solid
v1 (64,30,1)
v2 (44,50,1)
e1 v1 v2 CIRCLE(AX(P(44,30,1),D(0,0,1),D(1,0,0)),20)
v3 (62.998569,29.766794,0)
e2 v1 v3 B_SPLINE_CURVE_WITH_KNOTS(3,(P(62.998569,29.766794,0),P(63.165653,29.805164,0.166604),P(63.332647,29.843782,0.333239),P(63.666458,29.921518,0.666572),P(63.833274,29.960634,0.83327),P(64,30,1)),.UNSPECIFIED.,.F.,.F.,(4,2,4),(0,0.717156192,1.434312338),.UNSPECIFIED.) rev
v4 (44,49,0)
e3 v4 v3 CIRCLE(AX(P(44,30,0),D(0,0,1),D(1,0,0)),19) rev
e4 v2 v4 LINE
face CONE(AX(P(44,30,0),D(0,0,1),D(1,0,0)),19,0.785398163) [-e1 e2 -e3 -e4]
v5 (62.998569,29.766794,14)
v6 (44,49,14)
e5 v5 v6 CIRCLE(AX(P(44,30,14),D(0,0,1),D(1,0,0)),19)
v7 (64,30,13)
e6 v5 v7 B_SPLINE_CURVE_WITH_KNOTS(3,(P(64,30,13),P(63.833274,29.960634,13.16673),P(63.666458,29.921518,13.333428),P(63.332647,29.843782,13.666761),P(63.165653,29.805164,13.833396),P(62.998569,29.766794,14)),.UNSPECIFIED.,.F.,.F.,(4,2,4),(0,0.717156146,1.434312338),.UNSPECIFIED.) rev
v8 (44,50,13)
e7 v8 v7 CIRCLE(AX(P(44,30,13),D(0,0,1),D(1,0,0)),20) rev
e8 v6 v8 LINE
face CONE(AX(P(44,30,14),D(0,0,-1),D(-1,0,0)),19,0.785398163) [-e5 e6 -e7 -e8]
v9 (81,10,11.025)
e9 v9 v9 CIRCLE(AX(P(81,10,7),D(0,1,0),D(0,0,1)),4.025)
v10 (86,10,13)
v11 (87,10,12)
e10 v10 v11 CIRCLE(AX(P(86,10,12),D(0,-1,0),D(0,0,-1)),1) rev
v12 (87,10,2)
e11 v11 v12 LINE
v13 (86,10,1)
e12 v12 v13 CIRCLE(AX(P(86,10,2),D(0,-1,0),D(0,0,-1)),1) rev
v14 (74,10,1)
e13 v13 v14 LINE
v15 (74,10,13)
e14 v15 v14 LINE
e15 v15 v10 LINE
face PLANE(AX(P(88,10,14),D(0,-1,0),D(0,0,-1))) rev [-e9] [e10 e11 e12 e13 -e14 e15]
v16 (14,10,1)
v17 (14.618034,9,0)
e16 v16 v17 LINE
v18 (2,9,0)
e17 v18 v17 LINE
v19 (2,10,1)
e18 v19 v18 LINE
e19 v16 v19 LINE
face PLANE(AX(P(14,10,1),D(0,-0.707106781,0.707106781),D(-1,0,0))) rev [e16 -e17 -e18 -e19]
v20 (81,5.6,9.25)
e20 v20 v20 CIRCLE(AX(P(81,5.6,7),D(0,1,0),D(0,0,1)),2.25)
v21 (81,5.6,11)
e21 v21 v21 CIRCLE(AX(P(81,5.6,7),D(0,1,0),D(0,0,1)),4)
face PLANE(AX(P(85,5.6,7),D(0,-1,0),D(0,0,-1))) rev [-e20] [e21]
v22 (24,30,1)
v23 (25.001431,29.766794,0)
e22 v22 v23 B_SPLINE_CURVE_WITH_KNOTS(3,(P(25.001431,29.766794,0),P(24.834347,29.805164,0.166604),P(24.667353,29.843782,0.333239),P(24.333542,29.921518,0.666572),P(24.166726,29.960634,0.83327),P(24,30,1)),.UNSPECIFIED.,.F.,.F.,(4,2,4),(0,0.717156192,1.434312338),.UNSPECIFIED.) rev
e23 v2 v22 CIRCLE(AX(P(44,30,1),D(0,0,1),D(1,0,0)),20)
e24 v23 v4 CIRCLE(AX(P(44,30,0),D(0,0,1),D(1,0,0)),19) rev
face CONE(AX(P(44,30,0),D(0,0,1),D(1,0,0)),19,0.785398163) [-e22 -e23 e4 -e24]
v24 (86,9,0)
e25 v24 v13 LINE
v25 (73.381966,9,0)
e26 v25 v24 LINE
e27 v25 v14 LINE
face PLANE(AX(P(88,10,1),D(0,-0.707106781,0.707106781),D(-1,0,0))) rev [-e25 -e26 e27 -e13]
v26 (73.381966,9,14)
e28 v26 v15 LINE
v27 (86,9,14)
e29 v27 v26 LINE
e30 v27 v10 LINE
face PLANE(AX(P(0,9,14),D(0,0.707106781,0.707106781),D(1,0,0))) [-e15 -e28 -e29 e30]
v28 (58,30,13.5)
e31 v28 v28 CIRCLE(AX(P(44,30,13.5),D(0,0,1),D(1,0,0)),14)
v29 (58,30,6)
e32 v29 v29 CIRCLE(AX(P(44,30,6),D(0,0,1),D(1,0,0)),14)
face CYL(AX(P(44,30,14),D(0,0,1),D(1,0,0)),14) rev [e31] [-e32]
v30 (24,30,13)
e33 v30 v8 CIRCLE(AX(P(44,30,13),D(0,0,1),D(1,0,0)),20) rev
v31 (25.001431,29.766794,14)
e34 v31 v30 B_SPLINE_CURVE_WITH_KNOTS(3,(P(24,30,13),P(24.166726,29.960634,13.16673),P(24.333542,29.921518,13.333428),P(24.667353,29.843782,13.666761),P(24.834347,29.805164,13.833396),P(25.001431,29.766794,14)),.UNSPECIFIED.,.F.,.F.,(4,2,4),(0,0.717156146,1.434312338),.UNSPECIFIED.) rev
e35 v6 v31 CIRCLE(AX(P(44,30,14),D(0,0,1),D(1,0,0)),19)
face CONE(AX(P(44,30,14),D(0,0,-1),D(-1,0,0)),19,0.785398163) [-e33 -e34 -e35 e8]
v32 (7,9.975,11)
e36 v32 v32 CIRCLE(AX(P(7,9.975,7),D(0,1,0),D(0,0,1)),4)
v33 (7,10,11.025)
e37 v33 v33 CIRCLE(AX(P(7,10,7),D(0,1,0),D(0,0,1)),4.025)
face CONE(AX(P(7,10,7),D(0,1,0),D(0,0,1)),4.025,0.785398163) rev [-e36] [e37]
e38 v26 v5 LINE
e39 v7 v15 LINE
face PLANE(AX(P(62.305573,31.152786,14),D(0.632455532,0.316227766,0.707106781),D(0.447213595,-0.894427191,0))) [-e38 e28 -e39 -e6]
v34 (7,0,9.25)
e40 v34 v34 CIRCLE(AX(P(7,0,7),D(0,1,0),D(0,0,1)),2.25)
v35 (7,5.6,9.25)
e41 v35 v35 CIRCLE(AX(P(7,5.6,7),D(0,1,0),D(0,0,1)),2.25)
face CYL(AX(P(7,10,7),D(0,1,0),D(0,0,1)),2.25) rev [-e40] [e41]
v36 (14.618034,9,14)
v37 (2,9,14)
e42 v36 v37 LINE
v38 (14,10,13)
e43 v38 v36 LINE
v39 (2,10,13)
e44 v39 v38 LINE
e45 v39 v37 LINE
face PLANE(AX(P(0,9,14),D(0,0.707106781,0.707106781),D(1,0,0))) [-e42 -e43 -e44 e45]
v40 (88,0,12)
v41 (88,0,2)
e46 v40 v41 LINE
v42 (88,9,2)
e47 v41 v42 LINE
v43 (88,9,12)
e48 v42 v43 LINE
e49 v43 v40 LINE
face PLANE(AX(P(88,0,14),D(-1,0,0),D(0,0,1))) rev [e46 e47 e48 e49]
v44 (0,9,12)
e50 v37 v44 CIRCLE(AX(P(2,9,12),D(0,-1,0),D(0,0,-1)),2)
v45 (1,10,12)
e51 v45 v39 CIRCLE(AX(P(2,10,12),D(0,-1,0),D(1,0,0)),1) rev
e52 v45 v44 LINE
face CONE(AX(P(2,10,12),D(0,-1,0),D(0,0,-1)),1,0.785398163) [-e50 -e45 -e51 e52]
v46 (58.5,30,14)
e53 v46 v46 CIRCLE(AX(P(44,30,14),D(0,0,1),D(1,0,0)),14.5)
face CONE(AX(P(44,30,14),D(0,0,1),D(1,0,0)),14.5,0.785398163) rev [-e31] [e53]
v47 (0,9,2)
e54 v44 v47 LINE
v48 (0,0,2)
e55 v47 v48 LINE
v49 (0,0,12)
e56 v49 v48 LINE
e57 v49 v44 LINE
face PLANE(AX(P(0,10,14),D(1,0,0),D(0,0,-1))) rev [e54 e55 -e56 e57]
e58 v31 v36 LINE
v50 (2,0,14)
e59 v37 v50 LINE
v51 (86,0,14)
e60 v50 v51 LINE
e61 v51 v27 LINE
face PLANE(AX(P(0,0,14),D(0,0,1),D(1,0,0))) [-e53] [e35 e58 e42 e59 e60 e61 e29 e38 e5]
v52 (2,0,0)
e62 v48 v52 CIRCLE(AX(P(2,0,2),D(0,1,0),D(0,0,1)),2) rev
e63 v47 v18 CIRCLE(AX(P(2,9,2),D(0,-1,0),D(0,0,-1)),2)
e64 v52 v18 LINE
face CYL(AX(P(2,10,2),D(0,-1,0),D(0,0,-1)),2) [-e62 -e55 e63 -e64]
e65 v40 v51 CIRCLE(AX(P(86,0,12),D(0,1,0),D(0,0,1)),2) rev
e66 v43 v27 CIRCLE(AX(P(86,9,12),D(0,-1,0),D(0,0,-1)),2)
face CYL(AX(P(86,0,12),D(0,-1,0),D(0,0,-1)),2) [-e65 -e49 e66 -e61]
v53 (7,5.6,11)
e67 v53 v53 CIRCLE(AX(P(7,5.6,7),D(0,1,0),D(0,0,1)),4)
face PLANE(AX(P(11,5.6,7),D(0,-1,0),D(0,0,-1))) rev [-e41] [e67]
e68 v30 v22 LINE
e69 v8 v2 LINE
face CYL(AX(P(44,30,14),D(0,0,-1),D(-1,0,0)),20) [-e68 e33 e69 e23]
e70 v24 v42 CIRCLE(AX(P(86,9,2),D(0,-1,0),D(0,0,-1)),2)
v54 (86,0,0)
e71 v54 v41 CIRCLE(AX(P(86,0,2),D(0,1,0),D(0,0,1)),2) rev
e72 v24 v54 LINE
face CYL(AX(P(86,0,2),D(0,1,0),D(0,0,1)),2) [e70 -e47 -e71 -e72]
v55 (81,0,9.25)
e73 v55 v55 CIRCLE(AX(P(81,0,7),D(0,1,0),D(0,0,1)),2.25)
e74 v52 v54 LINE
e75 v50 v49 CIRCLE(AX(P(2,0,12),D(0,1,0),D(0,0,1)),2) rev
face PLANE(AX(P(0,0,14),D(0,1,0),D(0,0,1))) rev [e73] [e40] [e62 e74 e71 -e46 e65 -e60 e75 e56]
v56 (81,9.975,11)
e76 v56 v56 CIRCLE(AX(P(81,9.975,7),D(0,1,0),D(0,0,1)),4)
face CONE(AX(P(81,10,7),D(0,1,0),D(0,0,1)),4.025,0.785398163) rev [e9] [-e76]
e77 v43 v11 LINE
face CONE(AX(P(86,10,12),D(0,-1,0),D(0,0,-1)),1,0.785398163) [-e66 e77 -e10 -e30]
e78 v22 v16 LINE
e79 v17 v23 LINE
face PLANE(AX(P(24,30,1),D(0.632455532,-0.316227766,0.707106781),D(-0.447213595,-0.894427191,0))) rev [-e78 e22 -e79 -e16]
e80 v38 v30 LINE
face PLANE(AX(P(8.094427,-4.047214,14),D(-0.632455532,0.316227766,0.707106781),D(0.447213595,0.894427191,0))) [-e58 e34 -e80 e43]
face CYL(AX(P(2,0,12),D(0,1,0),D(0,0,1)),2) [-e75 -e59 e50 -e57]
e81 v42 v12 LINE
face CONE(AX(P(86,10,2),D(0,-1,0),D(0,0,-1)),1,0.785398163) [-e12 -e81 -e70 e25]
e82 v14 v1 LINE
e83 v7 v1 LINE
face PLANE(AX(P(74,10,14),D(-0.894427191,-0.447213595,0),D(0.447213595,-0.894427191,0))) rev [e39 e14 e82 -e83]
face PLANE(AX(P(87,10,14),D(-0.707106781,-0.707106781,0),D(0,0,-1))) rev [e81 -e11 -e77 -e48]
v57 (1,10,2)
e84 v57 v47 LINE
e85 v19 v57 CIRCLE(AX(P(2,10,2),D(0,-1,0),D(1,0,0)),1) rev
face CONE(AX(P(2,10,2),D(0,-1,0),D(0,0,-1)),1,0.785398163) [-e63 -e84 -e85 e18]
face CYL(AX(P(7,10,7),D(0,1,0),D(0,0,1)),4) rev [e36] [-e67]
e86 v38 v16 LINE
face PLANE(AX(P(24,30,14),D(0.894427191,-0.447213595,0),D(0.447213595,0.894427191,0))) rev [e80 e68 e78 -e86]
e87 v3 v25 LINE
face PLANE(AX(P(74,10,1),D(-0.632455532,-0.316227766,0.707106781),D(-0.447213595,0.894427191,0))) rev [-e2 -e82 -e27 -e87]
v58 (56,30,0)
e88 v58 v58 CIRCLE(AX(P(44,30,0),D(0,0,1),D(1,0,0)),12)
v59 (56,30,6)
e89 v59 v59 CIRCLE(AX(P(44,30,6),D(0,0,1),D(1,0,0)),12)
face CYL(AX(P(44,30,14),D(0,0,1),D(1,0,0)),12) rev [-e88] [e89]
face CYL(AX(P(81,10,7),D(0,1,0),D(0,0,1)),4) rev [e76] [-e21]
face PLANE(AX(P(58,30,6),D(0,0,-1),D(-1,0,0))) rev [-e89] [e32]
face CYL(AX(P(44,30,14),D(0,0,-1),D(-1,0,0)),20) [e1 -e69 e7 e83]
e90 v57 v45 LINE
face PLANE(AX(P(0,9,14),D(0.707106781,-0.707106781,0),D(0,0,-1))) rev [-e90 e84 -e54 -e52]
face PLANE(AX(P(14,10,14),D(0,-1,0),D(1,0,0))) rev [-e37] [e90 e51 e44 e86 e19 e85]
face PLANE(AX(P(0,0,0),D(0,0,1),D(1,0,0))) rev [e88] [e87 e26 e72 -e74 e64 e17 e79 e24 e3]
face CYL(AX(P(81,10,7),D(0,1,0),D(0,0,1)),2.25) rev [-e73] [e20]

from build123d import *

# Parameters (mm, degrees)
BODY_DEPTH           = 14
TOP_FILLET_R         = 20
SIDE_FILLETS_R       = 2
DESIGN_CHAMFERS_SIZE = 1


# Read off the part's stored shape, not the designer's step: mounting_holes
with BuildPart() as part:
    # Sketch1 → body (new body)
    with BuildSketch(Plane.XY):
        Polygon((0, 0), (88, 0), (88, 10), (74, 10), (64, 30), (64, 50), (24, 50), (24, 30), (14, 10), (0, 10), align=None)
    extrude(amount=BODY_DEPTH)

    # top_fillet
    top_fillet_edges = [part.edges().sort_by_distance(p)[0] for p in [
        (24, 50, 7),
        (64, 50, 7),
    ]]
    fillet(top_fillet_edges, radius=TOP_FILLET_R - 0.0001)  # a hair under: the kernel refuses the full size

    # Sketch4 → bearing_hole (revolve, cut)
    with BuildSketch(Plane(origin=(44, 30, 14), x_dir=(0, -1, 0), z_dir=(1, 0, 0))):
        Polygon((0, 0), (0, 14), (12, 14), (12, 8), (14, 8), (14, 0.5), (14.5, 0), align=None)
    revolve(axis=Axis((44, 30, 20.35), (0, 0, -1)), mode=Mode.SUBTRACT)

    # mounting_holes outline → mounting_holes (revolve, cut)
    with BuildSketch(Plane(origin=(81, 0, 7), x_dir=(1, 0, 0), z_dir=(0, 0, 1))):
        Polygon((0, 0), (2.25, 0), (2.25, 5.6), (4, 5.6), (4, 9.975), (4.025, 10), (0, 10), align=None)
    revolve(axis=Axis((81, 0, 7), (0, 1, 0)), mode=Mode.SUBTRACT)

    # mounting_holes 2 outline → mounting_holes 2 (revolve, cut)
    with BuildSketch(Plane(origin=(7, 0, 7), x_dir=(1, 0, 0), z_dir=(0, 0, 1))):
        Polygon((0, 10), (0, 0), (2.25, 0), (2.25, 5.6), (4, 5.6), (4, 9.975), (4.025, 10), align=None)
    revolve(axis=Axis((7, 0, 7), (0, 1, 0)), mode=Mode.SUBTRACT)

    # side_fillets
    side_fillets_edges = [part.edges().sort_by_distance(p)[0] for p in [
        (88, 5, 14),
        (88, 5, 0),
        (0, 5, 0),
        (0, 5, 14),
    ]]
    fillet(side_fillets_edges, radius=SIDE_FILLETS_R)

    # design_chamfers
    design_chamfers_edges = [part.edges().sort_by_distance(p)[0] for p in [
        (8, 10, 0),
        (19, 20, 0),
        (69, 20, 0),
        (69, 20, 14),
        (58.142164913, 44.142164913, 0),
        (29.857835087, 44.142164913, 0),
        (58.142164913, 44.142164913, 14),
        (29.857835087, 44.142164913, 14),
        (19, 20, 14),
        (8, 10, 14),
        (0, 10, 7),
        (80, 10, 0),
        (0.585786438, 10, 13.414213562),
        (0.585786438, 10, 0.585786438),
        (88, 10, 7),
        (80, 10, 14),
        (87.414213562, 10, 13.414213562),
        (87.414213562, 10, 0.585786438),
    ]]
    chamfer(design_chamfers_edges, length=DESIGN_CHAMFERS_SIZE)


solid = part.part
